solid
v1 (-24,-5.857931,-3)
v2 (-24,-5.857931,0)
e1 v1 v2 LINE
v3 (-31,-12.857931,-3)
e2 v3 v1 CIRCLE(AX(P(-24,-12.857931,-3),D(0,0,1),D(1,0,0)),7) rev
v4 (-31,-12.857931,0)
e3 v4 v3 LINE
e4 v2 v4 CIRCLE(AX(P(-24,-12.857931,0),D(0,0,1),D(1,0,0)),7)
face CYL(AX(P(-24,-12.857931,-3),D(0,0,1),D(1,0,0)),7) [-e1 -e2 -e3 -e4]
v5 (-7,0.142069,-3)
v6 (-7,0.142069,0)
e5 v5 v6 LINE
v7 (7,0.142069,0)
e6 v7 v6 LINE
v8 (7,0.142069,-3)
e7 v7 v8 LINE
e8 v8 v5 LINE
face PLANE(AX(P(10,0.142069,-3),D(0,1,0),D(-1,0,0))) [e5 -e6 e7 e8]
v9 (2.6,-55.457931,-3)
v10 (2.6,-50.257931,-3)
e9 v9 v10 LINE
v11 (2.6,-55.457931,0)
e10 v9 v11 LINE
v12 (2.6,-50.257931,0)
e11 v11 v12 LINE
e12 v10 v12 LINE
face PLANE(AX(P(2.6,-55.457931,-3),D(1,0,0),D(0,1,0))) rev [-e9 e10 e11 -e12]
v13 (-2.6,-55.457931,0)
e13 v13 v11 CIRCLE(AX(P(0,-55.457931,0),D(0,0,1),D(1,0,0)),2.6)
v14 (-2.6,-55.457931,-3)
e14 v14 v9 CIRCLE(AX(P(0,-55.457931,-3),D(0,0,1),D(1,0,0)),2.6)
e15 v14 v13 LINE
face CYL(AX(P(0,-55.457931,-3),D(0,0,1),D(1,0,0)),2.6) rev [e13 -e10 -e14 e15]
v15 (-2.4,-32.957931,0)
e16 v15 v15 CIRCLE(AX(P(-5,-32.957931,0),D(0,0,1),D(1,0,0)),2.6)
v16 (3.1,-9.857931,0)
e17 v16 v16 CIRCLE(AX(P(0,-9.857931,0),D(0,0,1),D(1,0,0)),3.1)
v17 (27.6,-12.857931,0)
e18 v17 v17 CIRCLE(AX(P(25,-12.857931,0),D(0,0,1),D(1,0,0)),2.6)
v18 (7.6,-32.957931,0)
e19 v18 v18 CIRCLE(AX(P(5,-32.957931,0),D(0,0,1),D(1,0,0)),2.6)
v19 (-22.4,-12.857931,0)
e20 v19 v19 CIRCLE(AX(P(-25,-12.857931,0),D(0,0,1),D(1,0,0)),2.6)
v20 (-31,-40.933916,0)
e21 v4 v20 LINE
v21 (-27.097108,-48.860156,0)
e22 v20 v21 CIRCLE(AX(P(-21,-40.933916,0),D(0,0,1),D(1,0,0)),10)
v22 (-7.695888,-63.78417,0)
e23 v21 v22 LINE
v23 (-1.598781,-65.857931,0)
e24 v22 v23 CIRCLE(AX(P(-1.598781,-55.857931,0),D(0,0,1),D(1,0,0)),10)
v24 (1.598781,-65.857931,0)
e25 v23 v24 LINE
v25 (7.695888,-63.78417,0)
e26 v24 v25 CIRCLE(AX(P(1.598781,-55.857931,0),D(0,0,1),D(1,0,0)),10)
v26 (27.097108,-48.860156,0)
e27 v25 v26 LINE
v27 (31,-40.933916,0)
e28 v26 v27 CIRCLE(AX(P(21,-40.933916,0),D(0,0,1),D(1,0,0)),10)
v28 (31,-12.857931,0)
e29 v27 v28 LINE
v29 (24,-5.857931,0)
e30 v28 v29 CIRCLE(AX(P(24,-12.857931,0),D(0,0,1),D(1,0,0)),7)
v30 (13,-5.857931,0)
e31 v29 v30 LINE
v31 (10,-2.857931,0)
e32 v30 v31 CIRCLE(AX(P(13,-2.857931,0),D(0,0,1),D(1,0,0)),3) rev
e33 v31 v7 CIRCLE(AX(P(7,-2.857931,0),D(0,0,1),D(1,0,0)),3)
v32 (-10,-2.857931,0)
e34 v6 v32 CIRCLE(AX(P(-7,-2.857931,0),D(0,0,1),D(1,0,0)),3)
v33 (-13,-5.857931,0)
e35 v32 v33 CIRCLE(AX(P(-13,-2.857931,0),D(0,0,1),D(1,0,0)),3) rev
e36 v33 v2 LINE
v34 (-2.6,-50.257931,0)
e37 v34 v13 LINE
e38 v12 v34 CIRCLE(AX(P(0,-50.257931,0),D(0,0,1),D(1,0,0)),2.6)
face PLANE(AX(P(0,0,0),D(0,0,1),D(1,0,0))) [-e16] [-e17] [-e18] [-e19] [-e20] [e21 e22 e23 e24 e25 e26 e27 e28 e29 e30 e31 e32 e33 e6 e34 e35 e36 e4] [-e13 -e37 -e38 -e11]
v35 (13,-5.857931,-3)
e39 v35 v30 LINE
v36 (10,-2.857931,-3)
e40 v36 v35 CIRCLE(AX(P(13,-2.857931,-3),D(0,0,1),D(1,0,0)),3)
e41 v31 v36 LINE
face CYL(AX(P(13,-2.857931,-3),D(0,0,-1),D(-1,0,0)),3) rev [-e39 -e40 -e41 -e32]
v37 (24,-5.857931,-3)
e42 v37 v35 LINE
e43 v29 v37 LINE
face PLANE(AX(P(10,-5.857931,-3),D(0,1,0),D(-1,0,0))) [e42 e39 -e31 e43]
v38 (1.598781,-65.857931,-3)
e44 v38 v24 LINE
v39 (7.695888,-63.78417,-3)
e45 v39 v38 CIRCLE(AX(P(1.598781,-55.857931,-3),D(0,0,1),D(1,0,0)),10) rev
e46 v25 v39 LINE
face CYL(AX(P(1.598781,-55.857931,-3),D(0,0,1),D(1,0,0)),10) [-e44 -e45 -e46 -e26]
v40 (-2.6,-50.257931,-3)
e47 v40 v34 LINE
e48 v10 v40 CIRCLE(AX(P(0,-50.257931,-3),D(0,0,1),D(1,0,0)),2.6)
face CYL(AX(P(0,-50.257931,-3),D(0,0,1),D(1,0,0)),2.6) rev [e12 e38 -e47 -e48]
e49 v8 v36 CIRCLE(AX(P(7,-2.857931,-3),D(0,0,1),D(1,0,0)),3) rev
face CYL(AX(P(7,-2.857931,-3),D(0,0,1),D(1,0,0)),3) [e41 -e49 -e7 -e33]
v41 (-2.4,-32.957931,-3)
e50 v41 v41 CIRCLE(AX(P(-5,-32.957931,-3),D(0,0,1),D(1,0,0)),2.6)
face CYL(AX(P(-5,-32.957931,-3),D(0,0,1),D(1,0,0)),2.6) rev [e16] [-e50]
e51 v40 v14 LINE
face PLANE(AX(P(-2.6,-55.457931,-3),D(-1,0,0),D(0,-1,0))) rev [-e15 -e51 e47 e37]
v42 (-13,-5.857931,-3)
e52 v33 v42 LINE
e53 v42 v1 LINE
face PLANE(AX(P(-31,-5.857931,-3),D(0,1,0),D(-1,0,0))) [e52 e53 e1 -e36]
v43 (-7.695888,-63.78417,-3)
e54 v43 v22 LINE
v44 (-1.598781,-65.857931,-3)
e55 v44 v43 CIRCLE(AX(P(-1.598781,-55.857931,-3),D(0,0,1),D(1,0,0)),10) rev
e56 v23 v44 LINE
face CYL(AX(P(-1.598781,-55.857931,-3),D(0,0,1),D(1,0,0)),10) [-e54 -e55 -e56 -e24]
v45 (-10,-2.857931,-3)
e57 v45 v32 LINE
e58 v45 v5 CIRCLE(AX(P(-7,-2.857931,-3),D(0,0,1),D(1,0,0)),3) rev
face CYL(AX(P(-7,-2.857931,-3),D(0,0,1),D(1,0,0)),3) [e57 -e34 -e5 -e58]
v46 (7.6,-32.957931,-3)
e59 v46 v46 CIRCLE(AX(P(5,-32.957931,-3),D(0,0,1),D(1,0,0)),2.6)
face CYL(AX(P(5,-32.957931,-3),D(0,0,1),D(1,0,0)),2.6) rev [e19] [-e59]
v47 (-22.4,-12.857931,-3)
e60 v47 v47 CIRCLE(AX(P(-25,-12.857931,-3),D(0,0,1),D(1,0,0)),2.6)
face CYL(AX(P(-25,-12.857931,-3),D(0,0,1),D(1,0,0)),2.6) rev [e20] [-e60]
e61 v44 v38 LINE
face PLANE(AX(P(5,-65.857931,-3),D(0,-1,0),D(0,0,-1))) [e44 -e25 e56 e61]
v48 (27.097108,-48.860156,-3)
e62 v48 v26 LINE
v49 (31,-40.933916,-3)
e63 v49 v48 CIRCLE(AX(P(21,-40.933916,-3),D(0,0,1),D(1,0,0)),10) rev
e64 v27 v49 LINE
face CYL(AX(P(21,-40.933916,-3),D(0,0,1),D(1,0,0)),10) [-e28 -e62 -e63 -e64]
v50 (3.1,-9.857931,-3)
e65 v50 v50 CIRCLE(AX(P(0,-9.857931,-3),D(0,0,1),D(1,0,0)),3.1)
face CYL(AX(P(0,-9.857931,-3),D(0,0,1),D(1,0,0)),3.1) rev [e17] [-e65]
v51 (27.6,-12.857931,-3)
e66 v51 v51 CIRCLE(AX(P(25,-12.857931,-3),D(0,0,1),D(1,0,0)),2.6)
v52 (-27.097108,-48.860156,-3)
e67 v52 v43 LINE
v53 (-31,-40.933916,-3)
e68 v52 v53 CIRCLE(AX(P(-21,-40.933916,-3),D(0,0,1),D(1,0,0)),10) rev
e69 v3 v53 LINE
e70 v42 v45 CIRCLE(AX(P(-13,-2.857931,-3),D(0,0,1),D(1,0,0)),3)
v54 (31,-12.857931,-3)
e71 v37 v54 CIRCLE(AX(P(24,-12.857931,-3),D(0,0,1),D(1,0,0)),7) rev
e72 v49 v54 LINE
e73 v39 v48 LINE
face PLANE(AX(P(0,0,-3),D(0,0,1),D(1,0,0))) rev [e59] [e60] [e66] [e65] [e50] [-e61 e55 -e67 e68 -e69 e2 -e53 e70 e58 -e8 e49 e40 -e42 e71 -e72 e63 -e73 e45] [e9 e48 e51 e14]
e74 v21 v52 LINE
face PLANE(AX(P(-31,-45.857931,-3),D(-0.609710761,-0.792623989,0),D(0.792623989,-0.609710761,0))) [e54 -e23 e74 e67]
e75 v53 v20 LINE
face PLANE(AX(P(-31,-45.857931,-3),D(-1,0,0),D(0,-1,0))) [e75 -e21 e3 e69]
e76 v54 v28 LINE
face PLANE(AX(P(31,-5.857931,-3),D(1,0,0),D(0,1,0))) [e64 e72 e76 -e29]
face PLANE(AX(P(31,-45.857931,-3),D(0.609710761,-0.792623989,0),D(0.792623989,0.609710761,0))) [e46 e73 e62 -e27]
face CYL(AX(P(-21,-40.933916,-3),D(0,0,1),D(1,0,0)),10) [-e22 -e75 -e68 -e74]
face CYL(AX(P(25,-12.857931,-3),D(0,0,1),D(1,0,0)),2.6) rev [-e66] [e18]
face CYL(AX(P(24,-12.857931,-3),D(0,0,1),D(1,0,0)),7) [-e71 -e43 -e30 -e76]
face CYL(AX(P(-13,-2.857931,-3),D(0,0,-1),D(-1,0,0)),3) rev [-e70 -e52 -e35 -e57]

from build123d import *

# Parameters (mm, degrees)
SKETCH1_R          = 2.6
SKETCH1_R_2        = 3.1
BASE_FLANGE1_DEPTH = 3
FILLET_10_MM_R     = 10
FILLET1_R          = 7
FILLET2_START      = -4
FILLET2_DEPTH      = 5
FILLET2_START_2    = -3
FILLET2_2_DEPTH    = 3


with BuildPart() as part:
    # Base-Flange1: sheet metal written as solids
    # Sketch1 → Base-Flange1 (new body)
    with BuildSketch(Plane.XY):
        Polygon((-31, -5.857930586), (-10, -5.857930586), (-10, 0.142069414), (10, 0.142069414), (10, -5.857930586), (31, -5.857930586), (31, -45.857930586), (5, -65.857930586), (-5, -65.857930586), (-31, -45.857930586), align=None)
        with Locations((25, -12.857930586)):
            Circle(SKETCH1_R, mode=Mode.SUBTRACT)
        with Locations((-25, -12.857930586)):
            Circle(SKETCH1_R, mode=Mode.SUBTRACT)
        with Locations((0, -9.857930586)):
            Circle(SKETCH1_R_2, mode=Mode.SUBTRACT)
        with Locations((5, -32.957930586)):
            Circle(SKETCH1_R, mode=Mode.SUBTRACT)
        with Locations((-5, -32.957930586)):
            Circle(SKETCH1_R, mode=Mode.SUBTRACT)
        with BuildLine():
            Line((-2.6, -55.457930586), (-2.6, -50.257930586))
            ThreePointArc((-2.6, -50.257930586), (0, -47.657930586), (2.6, -50.257930586))
            Line((2.6, -50.257930586), (2.6, -55.457930586))
            ThreePointArc((2.6, -55.457930586), (0, -58.057930586), (-2.6, -55.457930586))
        make_face(mode=Mode.SUBTRACT)
    extrude(amount=-BASE_FLANGE1_DEPTH)

    # fillet 10 mm
    fillet_10_mm_edges = [part.edges().sort_by_distance(p)[0] for p in [
        (31, -45.857930586, -1.5),
        (5, -65.857930586, -1.5),
        (-5, -65.857930586, -1.5),
        (-31, -45.857930586, -1.5),
    ]]
    fillet(fillet_10_mm_edges, radius=FILLET_10_MM_R)

    # Fillet1
    fillet1_edges = [part.edges().sort_by_distance(p)[0] for p in [
        (31, -5.857930586, -1.5),
        (-31, -5.857930586, -1.5),
    ]]
    fillet(fillet1_edges, radius=FILLET1_R)

    # Fillet2: read off the stored shape, not the designer's step
    # Fillet2 outline → Fillet2 (cut)
    with BuildSketch(Plane.XY.offset(FILLET2_START)):
        with BuildLine():
            Line((-10, 0.142069414), (-10, -2.857930586))
            ThreePointArc((-10, -2.857930586), (-9.121320344, -0.736610242), (-7, 0.142069414))
            Line((-7, 0.142069414), (-10, 0.142069414))
        make_face()
        with BuildLine():
            Line((10, 0.142069414), (7, 0.142069414))
            ThreePointArc((7, 0.142069414), (9.121320344, -0.736610242), (10, -2.857930586))
            Line((10, -2.857930586), (10, 0.142069414))
        make_face()
    extrude(amount=FILLET2_DEPTH, mode=Mode.SUBTRACT)

    # Fillet2 2 outline → Fillet2 2 (add)
    with BuildSketch(Plane.XY.offset(FILLET2_START_2)):
        with BuildLine():
            Line((-10, -5.857930586), (-10, -2.857930586))
            ThreePointArc((-10, -2.857930586), (-10.878679656, -4.97925093), (-13, -5.857930586))
            Line((-13, -5.857930586), (-10, -5.857930586))
        make_face()
        with BuildLine():
            ThreePointArc((13, -5.857930586), (10.878679656, -4.97925093), (10, -2.857930586))
            Line((10, -2.857930586), (10, -5.857930586))
            Line((10, -5.857930586), (13, -5.857930586))
        make_face()
    extrude(amount=FILLET2_2_DEPTH)


solid = part.part
